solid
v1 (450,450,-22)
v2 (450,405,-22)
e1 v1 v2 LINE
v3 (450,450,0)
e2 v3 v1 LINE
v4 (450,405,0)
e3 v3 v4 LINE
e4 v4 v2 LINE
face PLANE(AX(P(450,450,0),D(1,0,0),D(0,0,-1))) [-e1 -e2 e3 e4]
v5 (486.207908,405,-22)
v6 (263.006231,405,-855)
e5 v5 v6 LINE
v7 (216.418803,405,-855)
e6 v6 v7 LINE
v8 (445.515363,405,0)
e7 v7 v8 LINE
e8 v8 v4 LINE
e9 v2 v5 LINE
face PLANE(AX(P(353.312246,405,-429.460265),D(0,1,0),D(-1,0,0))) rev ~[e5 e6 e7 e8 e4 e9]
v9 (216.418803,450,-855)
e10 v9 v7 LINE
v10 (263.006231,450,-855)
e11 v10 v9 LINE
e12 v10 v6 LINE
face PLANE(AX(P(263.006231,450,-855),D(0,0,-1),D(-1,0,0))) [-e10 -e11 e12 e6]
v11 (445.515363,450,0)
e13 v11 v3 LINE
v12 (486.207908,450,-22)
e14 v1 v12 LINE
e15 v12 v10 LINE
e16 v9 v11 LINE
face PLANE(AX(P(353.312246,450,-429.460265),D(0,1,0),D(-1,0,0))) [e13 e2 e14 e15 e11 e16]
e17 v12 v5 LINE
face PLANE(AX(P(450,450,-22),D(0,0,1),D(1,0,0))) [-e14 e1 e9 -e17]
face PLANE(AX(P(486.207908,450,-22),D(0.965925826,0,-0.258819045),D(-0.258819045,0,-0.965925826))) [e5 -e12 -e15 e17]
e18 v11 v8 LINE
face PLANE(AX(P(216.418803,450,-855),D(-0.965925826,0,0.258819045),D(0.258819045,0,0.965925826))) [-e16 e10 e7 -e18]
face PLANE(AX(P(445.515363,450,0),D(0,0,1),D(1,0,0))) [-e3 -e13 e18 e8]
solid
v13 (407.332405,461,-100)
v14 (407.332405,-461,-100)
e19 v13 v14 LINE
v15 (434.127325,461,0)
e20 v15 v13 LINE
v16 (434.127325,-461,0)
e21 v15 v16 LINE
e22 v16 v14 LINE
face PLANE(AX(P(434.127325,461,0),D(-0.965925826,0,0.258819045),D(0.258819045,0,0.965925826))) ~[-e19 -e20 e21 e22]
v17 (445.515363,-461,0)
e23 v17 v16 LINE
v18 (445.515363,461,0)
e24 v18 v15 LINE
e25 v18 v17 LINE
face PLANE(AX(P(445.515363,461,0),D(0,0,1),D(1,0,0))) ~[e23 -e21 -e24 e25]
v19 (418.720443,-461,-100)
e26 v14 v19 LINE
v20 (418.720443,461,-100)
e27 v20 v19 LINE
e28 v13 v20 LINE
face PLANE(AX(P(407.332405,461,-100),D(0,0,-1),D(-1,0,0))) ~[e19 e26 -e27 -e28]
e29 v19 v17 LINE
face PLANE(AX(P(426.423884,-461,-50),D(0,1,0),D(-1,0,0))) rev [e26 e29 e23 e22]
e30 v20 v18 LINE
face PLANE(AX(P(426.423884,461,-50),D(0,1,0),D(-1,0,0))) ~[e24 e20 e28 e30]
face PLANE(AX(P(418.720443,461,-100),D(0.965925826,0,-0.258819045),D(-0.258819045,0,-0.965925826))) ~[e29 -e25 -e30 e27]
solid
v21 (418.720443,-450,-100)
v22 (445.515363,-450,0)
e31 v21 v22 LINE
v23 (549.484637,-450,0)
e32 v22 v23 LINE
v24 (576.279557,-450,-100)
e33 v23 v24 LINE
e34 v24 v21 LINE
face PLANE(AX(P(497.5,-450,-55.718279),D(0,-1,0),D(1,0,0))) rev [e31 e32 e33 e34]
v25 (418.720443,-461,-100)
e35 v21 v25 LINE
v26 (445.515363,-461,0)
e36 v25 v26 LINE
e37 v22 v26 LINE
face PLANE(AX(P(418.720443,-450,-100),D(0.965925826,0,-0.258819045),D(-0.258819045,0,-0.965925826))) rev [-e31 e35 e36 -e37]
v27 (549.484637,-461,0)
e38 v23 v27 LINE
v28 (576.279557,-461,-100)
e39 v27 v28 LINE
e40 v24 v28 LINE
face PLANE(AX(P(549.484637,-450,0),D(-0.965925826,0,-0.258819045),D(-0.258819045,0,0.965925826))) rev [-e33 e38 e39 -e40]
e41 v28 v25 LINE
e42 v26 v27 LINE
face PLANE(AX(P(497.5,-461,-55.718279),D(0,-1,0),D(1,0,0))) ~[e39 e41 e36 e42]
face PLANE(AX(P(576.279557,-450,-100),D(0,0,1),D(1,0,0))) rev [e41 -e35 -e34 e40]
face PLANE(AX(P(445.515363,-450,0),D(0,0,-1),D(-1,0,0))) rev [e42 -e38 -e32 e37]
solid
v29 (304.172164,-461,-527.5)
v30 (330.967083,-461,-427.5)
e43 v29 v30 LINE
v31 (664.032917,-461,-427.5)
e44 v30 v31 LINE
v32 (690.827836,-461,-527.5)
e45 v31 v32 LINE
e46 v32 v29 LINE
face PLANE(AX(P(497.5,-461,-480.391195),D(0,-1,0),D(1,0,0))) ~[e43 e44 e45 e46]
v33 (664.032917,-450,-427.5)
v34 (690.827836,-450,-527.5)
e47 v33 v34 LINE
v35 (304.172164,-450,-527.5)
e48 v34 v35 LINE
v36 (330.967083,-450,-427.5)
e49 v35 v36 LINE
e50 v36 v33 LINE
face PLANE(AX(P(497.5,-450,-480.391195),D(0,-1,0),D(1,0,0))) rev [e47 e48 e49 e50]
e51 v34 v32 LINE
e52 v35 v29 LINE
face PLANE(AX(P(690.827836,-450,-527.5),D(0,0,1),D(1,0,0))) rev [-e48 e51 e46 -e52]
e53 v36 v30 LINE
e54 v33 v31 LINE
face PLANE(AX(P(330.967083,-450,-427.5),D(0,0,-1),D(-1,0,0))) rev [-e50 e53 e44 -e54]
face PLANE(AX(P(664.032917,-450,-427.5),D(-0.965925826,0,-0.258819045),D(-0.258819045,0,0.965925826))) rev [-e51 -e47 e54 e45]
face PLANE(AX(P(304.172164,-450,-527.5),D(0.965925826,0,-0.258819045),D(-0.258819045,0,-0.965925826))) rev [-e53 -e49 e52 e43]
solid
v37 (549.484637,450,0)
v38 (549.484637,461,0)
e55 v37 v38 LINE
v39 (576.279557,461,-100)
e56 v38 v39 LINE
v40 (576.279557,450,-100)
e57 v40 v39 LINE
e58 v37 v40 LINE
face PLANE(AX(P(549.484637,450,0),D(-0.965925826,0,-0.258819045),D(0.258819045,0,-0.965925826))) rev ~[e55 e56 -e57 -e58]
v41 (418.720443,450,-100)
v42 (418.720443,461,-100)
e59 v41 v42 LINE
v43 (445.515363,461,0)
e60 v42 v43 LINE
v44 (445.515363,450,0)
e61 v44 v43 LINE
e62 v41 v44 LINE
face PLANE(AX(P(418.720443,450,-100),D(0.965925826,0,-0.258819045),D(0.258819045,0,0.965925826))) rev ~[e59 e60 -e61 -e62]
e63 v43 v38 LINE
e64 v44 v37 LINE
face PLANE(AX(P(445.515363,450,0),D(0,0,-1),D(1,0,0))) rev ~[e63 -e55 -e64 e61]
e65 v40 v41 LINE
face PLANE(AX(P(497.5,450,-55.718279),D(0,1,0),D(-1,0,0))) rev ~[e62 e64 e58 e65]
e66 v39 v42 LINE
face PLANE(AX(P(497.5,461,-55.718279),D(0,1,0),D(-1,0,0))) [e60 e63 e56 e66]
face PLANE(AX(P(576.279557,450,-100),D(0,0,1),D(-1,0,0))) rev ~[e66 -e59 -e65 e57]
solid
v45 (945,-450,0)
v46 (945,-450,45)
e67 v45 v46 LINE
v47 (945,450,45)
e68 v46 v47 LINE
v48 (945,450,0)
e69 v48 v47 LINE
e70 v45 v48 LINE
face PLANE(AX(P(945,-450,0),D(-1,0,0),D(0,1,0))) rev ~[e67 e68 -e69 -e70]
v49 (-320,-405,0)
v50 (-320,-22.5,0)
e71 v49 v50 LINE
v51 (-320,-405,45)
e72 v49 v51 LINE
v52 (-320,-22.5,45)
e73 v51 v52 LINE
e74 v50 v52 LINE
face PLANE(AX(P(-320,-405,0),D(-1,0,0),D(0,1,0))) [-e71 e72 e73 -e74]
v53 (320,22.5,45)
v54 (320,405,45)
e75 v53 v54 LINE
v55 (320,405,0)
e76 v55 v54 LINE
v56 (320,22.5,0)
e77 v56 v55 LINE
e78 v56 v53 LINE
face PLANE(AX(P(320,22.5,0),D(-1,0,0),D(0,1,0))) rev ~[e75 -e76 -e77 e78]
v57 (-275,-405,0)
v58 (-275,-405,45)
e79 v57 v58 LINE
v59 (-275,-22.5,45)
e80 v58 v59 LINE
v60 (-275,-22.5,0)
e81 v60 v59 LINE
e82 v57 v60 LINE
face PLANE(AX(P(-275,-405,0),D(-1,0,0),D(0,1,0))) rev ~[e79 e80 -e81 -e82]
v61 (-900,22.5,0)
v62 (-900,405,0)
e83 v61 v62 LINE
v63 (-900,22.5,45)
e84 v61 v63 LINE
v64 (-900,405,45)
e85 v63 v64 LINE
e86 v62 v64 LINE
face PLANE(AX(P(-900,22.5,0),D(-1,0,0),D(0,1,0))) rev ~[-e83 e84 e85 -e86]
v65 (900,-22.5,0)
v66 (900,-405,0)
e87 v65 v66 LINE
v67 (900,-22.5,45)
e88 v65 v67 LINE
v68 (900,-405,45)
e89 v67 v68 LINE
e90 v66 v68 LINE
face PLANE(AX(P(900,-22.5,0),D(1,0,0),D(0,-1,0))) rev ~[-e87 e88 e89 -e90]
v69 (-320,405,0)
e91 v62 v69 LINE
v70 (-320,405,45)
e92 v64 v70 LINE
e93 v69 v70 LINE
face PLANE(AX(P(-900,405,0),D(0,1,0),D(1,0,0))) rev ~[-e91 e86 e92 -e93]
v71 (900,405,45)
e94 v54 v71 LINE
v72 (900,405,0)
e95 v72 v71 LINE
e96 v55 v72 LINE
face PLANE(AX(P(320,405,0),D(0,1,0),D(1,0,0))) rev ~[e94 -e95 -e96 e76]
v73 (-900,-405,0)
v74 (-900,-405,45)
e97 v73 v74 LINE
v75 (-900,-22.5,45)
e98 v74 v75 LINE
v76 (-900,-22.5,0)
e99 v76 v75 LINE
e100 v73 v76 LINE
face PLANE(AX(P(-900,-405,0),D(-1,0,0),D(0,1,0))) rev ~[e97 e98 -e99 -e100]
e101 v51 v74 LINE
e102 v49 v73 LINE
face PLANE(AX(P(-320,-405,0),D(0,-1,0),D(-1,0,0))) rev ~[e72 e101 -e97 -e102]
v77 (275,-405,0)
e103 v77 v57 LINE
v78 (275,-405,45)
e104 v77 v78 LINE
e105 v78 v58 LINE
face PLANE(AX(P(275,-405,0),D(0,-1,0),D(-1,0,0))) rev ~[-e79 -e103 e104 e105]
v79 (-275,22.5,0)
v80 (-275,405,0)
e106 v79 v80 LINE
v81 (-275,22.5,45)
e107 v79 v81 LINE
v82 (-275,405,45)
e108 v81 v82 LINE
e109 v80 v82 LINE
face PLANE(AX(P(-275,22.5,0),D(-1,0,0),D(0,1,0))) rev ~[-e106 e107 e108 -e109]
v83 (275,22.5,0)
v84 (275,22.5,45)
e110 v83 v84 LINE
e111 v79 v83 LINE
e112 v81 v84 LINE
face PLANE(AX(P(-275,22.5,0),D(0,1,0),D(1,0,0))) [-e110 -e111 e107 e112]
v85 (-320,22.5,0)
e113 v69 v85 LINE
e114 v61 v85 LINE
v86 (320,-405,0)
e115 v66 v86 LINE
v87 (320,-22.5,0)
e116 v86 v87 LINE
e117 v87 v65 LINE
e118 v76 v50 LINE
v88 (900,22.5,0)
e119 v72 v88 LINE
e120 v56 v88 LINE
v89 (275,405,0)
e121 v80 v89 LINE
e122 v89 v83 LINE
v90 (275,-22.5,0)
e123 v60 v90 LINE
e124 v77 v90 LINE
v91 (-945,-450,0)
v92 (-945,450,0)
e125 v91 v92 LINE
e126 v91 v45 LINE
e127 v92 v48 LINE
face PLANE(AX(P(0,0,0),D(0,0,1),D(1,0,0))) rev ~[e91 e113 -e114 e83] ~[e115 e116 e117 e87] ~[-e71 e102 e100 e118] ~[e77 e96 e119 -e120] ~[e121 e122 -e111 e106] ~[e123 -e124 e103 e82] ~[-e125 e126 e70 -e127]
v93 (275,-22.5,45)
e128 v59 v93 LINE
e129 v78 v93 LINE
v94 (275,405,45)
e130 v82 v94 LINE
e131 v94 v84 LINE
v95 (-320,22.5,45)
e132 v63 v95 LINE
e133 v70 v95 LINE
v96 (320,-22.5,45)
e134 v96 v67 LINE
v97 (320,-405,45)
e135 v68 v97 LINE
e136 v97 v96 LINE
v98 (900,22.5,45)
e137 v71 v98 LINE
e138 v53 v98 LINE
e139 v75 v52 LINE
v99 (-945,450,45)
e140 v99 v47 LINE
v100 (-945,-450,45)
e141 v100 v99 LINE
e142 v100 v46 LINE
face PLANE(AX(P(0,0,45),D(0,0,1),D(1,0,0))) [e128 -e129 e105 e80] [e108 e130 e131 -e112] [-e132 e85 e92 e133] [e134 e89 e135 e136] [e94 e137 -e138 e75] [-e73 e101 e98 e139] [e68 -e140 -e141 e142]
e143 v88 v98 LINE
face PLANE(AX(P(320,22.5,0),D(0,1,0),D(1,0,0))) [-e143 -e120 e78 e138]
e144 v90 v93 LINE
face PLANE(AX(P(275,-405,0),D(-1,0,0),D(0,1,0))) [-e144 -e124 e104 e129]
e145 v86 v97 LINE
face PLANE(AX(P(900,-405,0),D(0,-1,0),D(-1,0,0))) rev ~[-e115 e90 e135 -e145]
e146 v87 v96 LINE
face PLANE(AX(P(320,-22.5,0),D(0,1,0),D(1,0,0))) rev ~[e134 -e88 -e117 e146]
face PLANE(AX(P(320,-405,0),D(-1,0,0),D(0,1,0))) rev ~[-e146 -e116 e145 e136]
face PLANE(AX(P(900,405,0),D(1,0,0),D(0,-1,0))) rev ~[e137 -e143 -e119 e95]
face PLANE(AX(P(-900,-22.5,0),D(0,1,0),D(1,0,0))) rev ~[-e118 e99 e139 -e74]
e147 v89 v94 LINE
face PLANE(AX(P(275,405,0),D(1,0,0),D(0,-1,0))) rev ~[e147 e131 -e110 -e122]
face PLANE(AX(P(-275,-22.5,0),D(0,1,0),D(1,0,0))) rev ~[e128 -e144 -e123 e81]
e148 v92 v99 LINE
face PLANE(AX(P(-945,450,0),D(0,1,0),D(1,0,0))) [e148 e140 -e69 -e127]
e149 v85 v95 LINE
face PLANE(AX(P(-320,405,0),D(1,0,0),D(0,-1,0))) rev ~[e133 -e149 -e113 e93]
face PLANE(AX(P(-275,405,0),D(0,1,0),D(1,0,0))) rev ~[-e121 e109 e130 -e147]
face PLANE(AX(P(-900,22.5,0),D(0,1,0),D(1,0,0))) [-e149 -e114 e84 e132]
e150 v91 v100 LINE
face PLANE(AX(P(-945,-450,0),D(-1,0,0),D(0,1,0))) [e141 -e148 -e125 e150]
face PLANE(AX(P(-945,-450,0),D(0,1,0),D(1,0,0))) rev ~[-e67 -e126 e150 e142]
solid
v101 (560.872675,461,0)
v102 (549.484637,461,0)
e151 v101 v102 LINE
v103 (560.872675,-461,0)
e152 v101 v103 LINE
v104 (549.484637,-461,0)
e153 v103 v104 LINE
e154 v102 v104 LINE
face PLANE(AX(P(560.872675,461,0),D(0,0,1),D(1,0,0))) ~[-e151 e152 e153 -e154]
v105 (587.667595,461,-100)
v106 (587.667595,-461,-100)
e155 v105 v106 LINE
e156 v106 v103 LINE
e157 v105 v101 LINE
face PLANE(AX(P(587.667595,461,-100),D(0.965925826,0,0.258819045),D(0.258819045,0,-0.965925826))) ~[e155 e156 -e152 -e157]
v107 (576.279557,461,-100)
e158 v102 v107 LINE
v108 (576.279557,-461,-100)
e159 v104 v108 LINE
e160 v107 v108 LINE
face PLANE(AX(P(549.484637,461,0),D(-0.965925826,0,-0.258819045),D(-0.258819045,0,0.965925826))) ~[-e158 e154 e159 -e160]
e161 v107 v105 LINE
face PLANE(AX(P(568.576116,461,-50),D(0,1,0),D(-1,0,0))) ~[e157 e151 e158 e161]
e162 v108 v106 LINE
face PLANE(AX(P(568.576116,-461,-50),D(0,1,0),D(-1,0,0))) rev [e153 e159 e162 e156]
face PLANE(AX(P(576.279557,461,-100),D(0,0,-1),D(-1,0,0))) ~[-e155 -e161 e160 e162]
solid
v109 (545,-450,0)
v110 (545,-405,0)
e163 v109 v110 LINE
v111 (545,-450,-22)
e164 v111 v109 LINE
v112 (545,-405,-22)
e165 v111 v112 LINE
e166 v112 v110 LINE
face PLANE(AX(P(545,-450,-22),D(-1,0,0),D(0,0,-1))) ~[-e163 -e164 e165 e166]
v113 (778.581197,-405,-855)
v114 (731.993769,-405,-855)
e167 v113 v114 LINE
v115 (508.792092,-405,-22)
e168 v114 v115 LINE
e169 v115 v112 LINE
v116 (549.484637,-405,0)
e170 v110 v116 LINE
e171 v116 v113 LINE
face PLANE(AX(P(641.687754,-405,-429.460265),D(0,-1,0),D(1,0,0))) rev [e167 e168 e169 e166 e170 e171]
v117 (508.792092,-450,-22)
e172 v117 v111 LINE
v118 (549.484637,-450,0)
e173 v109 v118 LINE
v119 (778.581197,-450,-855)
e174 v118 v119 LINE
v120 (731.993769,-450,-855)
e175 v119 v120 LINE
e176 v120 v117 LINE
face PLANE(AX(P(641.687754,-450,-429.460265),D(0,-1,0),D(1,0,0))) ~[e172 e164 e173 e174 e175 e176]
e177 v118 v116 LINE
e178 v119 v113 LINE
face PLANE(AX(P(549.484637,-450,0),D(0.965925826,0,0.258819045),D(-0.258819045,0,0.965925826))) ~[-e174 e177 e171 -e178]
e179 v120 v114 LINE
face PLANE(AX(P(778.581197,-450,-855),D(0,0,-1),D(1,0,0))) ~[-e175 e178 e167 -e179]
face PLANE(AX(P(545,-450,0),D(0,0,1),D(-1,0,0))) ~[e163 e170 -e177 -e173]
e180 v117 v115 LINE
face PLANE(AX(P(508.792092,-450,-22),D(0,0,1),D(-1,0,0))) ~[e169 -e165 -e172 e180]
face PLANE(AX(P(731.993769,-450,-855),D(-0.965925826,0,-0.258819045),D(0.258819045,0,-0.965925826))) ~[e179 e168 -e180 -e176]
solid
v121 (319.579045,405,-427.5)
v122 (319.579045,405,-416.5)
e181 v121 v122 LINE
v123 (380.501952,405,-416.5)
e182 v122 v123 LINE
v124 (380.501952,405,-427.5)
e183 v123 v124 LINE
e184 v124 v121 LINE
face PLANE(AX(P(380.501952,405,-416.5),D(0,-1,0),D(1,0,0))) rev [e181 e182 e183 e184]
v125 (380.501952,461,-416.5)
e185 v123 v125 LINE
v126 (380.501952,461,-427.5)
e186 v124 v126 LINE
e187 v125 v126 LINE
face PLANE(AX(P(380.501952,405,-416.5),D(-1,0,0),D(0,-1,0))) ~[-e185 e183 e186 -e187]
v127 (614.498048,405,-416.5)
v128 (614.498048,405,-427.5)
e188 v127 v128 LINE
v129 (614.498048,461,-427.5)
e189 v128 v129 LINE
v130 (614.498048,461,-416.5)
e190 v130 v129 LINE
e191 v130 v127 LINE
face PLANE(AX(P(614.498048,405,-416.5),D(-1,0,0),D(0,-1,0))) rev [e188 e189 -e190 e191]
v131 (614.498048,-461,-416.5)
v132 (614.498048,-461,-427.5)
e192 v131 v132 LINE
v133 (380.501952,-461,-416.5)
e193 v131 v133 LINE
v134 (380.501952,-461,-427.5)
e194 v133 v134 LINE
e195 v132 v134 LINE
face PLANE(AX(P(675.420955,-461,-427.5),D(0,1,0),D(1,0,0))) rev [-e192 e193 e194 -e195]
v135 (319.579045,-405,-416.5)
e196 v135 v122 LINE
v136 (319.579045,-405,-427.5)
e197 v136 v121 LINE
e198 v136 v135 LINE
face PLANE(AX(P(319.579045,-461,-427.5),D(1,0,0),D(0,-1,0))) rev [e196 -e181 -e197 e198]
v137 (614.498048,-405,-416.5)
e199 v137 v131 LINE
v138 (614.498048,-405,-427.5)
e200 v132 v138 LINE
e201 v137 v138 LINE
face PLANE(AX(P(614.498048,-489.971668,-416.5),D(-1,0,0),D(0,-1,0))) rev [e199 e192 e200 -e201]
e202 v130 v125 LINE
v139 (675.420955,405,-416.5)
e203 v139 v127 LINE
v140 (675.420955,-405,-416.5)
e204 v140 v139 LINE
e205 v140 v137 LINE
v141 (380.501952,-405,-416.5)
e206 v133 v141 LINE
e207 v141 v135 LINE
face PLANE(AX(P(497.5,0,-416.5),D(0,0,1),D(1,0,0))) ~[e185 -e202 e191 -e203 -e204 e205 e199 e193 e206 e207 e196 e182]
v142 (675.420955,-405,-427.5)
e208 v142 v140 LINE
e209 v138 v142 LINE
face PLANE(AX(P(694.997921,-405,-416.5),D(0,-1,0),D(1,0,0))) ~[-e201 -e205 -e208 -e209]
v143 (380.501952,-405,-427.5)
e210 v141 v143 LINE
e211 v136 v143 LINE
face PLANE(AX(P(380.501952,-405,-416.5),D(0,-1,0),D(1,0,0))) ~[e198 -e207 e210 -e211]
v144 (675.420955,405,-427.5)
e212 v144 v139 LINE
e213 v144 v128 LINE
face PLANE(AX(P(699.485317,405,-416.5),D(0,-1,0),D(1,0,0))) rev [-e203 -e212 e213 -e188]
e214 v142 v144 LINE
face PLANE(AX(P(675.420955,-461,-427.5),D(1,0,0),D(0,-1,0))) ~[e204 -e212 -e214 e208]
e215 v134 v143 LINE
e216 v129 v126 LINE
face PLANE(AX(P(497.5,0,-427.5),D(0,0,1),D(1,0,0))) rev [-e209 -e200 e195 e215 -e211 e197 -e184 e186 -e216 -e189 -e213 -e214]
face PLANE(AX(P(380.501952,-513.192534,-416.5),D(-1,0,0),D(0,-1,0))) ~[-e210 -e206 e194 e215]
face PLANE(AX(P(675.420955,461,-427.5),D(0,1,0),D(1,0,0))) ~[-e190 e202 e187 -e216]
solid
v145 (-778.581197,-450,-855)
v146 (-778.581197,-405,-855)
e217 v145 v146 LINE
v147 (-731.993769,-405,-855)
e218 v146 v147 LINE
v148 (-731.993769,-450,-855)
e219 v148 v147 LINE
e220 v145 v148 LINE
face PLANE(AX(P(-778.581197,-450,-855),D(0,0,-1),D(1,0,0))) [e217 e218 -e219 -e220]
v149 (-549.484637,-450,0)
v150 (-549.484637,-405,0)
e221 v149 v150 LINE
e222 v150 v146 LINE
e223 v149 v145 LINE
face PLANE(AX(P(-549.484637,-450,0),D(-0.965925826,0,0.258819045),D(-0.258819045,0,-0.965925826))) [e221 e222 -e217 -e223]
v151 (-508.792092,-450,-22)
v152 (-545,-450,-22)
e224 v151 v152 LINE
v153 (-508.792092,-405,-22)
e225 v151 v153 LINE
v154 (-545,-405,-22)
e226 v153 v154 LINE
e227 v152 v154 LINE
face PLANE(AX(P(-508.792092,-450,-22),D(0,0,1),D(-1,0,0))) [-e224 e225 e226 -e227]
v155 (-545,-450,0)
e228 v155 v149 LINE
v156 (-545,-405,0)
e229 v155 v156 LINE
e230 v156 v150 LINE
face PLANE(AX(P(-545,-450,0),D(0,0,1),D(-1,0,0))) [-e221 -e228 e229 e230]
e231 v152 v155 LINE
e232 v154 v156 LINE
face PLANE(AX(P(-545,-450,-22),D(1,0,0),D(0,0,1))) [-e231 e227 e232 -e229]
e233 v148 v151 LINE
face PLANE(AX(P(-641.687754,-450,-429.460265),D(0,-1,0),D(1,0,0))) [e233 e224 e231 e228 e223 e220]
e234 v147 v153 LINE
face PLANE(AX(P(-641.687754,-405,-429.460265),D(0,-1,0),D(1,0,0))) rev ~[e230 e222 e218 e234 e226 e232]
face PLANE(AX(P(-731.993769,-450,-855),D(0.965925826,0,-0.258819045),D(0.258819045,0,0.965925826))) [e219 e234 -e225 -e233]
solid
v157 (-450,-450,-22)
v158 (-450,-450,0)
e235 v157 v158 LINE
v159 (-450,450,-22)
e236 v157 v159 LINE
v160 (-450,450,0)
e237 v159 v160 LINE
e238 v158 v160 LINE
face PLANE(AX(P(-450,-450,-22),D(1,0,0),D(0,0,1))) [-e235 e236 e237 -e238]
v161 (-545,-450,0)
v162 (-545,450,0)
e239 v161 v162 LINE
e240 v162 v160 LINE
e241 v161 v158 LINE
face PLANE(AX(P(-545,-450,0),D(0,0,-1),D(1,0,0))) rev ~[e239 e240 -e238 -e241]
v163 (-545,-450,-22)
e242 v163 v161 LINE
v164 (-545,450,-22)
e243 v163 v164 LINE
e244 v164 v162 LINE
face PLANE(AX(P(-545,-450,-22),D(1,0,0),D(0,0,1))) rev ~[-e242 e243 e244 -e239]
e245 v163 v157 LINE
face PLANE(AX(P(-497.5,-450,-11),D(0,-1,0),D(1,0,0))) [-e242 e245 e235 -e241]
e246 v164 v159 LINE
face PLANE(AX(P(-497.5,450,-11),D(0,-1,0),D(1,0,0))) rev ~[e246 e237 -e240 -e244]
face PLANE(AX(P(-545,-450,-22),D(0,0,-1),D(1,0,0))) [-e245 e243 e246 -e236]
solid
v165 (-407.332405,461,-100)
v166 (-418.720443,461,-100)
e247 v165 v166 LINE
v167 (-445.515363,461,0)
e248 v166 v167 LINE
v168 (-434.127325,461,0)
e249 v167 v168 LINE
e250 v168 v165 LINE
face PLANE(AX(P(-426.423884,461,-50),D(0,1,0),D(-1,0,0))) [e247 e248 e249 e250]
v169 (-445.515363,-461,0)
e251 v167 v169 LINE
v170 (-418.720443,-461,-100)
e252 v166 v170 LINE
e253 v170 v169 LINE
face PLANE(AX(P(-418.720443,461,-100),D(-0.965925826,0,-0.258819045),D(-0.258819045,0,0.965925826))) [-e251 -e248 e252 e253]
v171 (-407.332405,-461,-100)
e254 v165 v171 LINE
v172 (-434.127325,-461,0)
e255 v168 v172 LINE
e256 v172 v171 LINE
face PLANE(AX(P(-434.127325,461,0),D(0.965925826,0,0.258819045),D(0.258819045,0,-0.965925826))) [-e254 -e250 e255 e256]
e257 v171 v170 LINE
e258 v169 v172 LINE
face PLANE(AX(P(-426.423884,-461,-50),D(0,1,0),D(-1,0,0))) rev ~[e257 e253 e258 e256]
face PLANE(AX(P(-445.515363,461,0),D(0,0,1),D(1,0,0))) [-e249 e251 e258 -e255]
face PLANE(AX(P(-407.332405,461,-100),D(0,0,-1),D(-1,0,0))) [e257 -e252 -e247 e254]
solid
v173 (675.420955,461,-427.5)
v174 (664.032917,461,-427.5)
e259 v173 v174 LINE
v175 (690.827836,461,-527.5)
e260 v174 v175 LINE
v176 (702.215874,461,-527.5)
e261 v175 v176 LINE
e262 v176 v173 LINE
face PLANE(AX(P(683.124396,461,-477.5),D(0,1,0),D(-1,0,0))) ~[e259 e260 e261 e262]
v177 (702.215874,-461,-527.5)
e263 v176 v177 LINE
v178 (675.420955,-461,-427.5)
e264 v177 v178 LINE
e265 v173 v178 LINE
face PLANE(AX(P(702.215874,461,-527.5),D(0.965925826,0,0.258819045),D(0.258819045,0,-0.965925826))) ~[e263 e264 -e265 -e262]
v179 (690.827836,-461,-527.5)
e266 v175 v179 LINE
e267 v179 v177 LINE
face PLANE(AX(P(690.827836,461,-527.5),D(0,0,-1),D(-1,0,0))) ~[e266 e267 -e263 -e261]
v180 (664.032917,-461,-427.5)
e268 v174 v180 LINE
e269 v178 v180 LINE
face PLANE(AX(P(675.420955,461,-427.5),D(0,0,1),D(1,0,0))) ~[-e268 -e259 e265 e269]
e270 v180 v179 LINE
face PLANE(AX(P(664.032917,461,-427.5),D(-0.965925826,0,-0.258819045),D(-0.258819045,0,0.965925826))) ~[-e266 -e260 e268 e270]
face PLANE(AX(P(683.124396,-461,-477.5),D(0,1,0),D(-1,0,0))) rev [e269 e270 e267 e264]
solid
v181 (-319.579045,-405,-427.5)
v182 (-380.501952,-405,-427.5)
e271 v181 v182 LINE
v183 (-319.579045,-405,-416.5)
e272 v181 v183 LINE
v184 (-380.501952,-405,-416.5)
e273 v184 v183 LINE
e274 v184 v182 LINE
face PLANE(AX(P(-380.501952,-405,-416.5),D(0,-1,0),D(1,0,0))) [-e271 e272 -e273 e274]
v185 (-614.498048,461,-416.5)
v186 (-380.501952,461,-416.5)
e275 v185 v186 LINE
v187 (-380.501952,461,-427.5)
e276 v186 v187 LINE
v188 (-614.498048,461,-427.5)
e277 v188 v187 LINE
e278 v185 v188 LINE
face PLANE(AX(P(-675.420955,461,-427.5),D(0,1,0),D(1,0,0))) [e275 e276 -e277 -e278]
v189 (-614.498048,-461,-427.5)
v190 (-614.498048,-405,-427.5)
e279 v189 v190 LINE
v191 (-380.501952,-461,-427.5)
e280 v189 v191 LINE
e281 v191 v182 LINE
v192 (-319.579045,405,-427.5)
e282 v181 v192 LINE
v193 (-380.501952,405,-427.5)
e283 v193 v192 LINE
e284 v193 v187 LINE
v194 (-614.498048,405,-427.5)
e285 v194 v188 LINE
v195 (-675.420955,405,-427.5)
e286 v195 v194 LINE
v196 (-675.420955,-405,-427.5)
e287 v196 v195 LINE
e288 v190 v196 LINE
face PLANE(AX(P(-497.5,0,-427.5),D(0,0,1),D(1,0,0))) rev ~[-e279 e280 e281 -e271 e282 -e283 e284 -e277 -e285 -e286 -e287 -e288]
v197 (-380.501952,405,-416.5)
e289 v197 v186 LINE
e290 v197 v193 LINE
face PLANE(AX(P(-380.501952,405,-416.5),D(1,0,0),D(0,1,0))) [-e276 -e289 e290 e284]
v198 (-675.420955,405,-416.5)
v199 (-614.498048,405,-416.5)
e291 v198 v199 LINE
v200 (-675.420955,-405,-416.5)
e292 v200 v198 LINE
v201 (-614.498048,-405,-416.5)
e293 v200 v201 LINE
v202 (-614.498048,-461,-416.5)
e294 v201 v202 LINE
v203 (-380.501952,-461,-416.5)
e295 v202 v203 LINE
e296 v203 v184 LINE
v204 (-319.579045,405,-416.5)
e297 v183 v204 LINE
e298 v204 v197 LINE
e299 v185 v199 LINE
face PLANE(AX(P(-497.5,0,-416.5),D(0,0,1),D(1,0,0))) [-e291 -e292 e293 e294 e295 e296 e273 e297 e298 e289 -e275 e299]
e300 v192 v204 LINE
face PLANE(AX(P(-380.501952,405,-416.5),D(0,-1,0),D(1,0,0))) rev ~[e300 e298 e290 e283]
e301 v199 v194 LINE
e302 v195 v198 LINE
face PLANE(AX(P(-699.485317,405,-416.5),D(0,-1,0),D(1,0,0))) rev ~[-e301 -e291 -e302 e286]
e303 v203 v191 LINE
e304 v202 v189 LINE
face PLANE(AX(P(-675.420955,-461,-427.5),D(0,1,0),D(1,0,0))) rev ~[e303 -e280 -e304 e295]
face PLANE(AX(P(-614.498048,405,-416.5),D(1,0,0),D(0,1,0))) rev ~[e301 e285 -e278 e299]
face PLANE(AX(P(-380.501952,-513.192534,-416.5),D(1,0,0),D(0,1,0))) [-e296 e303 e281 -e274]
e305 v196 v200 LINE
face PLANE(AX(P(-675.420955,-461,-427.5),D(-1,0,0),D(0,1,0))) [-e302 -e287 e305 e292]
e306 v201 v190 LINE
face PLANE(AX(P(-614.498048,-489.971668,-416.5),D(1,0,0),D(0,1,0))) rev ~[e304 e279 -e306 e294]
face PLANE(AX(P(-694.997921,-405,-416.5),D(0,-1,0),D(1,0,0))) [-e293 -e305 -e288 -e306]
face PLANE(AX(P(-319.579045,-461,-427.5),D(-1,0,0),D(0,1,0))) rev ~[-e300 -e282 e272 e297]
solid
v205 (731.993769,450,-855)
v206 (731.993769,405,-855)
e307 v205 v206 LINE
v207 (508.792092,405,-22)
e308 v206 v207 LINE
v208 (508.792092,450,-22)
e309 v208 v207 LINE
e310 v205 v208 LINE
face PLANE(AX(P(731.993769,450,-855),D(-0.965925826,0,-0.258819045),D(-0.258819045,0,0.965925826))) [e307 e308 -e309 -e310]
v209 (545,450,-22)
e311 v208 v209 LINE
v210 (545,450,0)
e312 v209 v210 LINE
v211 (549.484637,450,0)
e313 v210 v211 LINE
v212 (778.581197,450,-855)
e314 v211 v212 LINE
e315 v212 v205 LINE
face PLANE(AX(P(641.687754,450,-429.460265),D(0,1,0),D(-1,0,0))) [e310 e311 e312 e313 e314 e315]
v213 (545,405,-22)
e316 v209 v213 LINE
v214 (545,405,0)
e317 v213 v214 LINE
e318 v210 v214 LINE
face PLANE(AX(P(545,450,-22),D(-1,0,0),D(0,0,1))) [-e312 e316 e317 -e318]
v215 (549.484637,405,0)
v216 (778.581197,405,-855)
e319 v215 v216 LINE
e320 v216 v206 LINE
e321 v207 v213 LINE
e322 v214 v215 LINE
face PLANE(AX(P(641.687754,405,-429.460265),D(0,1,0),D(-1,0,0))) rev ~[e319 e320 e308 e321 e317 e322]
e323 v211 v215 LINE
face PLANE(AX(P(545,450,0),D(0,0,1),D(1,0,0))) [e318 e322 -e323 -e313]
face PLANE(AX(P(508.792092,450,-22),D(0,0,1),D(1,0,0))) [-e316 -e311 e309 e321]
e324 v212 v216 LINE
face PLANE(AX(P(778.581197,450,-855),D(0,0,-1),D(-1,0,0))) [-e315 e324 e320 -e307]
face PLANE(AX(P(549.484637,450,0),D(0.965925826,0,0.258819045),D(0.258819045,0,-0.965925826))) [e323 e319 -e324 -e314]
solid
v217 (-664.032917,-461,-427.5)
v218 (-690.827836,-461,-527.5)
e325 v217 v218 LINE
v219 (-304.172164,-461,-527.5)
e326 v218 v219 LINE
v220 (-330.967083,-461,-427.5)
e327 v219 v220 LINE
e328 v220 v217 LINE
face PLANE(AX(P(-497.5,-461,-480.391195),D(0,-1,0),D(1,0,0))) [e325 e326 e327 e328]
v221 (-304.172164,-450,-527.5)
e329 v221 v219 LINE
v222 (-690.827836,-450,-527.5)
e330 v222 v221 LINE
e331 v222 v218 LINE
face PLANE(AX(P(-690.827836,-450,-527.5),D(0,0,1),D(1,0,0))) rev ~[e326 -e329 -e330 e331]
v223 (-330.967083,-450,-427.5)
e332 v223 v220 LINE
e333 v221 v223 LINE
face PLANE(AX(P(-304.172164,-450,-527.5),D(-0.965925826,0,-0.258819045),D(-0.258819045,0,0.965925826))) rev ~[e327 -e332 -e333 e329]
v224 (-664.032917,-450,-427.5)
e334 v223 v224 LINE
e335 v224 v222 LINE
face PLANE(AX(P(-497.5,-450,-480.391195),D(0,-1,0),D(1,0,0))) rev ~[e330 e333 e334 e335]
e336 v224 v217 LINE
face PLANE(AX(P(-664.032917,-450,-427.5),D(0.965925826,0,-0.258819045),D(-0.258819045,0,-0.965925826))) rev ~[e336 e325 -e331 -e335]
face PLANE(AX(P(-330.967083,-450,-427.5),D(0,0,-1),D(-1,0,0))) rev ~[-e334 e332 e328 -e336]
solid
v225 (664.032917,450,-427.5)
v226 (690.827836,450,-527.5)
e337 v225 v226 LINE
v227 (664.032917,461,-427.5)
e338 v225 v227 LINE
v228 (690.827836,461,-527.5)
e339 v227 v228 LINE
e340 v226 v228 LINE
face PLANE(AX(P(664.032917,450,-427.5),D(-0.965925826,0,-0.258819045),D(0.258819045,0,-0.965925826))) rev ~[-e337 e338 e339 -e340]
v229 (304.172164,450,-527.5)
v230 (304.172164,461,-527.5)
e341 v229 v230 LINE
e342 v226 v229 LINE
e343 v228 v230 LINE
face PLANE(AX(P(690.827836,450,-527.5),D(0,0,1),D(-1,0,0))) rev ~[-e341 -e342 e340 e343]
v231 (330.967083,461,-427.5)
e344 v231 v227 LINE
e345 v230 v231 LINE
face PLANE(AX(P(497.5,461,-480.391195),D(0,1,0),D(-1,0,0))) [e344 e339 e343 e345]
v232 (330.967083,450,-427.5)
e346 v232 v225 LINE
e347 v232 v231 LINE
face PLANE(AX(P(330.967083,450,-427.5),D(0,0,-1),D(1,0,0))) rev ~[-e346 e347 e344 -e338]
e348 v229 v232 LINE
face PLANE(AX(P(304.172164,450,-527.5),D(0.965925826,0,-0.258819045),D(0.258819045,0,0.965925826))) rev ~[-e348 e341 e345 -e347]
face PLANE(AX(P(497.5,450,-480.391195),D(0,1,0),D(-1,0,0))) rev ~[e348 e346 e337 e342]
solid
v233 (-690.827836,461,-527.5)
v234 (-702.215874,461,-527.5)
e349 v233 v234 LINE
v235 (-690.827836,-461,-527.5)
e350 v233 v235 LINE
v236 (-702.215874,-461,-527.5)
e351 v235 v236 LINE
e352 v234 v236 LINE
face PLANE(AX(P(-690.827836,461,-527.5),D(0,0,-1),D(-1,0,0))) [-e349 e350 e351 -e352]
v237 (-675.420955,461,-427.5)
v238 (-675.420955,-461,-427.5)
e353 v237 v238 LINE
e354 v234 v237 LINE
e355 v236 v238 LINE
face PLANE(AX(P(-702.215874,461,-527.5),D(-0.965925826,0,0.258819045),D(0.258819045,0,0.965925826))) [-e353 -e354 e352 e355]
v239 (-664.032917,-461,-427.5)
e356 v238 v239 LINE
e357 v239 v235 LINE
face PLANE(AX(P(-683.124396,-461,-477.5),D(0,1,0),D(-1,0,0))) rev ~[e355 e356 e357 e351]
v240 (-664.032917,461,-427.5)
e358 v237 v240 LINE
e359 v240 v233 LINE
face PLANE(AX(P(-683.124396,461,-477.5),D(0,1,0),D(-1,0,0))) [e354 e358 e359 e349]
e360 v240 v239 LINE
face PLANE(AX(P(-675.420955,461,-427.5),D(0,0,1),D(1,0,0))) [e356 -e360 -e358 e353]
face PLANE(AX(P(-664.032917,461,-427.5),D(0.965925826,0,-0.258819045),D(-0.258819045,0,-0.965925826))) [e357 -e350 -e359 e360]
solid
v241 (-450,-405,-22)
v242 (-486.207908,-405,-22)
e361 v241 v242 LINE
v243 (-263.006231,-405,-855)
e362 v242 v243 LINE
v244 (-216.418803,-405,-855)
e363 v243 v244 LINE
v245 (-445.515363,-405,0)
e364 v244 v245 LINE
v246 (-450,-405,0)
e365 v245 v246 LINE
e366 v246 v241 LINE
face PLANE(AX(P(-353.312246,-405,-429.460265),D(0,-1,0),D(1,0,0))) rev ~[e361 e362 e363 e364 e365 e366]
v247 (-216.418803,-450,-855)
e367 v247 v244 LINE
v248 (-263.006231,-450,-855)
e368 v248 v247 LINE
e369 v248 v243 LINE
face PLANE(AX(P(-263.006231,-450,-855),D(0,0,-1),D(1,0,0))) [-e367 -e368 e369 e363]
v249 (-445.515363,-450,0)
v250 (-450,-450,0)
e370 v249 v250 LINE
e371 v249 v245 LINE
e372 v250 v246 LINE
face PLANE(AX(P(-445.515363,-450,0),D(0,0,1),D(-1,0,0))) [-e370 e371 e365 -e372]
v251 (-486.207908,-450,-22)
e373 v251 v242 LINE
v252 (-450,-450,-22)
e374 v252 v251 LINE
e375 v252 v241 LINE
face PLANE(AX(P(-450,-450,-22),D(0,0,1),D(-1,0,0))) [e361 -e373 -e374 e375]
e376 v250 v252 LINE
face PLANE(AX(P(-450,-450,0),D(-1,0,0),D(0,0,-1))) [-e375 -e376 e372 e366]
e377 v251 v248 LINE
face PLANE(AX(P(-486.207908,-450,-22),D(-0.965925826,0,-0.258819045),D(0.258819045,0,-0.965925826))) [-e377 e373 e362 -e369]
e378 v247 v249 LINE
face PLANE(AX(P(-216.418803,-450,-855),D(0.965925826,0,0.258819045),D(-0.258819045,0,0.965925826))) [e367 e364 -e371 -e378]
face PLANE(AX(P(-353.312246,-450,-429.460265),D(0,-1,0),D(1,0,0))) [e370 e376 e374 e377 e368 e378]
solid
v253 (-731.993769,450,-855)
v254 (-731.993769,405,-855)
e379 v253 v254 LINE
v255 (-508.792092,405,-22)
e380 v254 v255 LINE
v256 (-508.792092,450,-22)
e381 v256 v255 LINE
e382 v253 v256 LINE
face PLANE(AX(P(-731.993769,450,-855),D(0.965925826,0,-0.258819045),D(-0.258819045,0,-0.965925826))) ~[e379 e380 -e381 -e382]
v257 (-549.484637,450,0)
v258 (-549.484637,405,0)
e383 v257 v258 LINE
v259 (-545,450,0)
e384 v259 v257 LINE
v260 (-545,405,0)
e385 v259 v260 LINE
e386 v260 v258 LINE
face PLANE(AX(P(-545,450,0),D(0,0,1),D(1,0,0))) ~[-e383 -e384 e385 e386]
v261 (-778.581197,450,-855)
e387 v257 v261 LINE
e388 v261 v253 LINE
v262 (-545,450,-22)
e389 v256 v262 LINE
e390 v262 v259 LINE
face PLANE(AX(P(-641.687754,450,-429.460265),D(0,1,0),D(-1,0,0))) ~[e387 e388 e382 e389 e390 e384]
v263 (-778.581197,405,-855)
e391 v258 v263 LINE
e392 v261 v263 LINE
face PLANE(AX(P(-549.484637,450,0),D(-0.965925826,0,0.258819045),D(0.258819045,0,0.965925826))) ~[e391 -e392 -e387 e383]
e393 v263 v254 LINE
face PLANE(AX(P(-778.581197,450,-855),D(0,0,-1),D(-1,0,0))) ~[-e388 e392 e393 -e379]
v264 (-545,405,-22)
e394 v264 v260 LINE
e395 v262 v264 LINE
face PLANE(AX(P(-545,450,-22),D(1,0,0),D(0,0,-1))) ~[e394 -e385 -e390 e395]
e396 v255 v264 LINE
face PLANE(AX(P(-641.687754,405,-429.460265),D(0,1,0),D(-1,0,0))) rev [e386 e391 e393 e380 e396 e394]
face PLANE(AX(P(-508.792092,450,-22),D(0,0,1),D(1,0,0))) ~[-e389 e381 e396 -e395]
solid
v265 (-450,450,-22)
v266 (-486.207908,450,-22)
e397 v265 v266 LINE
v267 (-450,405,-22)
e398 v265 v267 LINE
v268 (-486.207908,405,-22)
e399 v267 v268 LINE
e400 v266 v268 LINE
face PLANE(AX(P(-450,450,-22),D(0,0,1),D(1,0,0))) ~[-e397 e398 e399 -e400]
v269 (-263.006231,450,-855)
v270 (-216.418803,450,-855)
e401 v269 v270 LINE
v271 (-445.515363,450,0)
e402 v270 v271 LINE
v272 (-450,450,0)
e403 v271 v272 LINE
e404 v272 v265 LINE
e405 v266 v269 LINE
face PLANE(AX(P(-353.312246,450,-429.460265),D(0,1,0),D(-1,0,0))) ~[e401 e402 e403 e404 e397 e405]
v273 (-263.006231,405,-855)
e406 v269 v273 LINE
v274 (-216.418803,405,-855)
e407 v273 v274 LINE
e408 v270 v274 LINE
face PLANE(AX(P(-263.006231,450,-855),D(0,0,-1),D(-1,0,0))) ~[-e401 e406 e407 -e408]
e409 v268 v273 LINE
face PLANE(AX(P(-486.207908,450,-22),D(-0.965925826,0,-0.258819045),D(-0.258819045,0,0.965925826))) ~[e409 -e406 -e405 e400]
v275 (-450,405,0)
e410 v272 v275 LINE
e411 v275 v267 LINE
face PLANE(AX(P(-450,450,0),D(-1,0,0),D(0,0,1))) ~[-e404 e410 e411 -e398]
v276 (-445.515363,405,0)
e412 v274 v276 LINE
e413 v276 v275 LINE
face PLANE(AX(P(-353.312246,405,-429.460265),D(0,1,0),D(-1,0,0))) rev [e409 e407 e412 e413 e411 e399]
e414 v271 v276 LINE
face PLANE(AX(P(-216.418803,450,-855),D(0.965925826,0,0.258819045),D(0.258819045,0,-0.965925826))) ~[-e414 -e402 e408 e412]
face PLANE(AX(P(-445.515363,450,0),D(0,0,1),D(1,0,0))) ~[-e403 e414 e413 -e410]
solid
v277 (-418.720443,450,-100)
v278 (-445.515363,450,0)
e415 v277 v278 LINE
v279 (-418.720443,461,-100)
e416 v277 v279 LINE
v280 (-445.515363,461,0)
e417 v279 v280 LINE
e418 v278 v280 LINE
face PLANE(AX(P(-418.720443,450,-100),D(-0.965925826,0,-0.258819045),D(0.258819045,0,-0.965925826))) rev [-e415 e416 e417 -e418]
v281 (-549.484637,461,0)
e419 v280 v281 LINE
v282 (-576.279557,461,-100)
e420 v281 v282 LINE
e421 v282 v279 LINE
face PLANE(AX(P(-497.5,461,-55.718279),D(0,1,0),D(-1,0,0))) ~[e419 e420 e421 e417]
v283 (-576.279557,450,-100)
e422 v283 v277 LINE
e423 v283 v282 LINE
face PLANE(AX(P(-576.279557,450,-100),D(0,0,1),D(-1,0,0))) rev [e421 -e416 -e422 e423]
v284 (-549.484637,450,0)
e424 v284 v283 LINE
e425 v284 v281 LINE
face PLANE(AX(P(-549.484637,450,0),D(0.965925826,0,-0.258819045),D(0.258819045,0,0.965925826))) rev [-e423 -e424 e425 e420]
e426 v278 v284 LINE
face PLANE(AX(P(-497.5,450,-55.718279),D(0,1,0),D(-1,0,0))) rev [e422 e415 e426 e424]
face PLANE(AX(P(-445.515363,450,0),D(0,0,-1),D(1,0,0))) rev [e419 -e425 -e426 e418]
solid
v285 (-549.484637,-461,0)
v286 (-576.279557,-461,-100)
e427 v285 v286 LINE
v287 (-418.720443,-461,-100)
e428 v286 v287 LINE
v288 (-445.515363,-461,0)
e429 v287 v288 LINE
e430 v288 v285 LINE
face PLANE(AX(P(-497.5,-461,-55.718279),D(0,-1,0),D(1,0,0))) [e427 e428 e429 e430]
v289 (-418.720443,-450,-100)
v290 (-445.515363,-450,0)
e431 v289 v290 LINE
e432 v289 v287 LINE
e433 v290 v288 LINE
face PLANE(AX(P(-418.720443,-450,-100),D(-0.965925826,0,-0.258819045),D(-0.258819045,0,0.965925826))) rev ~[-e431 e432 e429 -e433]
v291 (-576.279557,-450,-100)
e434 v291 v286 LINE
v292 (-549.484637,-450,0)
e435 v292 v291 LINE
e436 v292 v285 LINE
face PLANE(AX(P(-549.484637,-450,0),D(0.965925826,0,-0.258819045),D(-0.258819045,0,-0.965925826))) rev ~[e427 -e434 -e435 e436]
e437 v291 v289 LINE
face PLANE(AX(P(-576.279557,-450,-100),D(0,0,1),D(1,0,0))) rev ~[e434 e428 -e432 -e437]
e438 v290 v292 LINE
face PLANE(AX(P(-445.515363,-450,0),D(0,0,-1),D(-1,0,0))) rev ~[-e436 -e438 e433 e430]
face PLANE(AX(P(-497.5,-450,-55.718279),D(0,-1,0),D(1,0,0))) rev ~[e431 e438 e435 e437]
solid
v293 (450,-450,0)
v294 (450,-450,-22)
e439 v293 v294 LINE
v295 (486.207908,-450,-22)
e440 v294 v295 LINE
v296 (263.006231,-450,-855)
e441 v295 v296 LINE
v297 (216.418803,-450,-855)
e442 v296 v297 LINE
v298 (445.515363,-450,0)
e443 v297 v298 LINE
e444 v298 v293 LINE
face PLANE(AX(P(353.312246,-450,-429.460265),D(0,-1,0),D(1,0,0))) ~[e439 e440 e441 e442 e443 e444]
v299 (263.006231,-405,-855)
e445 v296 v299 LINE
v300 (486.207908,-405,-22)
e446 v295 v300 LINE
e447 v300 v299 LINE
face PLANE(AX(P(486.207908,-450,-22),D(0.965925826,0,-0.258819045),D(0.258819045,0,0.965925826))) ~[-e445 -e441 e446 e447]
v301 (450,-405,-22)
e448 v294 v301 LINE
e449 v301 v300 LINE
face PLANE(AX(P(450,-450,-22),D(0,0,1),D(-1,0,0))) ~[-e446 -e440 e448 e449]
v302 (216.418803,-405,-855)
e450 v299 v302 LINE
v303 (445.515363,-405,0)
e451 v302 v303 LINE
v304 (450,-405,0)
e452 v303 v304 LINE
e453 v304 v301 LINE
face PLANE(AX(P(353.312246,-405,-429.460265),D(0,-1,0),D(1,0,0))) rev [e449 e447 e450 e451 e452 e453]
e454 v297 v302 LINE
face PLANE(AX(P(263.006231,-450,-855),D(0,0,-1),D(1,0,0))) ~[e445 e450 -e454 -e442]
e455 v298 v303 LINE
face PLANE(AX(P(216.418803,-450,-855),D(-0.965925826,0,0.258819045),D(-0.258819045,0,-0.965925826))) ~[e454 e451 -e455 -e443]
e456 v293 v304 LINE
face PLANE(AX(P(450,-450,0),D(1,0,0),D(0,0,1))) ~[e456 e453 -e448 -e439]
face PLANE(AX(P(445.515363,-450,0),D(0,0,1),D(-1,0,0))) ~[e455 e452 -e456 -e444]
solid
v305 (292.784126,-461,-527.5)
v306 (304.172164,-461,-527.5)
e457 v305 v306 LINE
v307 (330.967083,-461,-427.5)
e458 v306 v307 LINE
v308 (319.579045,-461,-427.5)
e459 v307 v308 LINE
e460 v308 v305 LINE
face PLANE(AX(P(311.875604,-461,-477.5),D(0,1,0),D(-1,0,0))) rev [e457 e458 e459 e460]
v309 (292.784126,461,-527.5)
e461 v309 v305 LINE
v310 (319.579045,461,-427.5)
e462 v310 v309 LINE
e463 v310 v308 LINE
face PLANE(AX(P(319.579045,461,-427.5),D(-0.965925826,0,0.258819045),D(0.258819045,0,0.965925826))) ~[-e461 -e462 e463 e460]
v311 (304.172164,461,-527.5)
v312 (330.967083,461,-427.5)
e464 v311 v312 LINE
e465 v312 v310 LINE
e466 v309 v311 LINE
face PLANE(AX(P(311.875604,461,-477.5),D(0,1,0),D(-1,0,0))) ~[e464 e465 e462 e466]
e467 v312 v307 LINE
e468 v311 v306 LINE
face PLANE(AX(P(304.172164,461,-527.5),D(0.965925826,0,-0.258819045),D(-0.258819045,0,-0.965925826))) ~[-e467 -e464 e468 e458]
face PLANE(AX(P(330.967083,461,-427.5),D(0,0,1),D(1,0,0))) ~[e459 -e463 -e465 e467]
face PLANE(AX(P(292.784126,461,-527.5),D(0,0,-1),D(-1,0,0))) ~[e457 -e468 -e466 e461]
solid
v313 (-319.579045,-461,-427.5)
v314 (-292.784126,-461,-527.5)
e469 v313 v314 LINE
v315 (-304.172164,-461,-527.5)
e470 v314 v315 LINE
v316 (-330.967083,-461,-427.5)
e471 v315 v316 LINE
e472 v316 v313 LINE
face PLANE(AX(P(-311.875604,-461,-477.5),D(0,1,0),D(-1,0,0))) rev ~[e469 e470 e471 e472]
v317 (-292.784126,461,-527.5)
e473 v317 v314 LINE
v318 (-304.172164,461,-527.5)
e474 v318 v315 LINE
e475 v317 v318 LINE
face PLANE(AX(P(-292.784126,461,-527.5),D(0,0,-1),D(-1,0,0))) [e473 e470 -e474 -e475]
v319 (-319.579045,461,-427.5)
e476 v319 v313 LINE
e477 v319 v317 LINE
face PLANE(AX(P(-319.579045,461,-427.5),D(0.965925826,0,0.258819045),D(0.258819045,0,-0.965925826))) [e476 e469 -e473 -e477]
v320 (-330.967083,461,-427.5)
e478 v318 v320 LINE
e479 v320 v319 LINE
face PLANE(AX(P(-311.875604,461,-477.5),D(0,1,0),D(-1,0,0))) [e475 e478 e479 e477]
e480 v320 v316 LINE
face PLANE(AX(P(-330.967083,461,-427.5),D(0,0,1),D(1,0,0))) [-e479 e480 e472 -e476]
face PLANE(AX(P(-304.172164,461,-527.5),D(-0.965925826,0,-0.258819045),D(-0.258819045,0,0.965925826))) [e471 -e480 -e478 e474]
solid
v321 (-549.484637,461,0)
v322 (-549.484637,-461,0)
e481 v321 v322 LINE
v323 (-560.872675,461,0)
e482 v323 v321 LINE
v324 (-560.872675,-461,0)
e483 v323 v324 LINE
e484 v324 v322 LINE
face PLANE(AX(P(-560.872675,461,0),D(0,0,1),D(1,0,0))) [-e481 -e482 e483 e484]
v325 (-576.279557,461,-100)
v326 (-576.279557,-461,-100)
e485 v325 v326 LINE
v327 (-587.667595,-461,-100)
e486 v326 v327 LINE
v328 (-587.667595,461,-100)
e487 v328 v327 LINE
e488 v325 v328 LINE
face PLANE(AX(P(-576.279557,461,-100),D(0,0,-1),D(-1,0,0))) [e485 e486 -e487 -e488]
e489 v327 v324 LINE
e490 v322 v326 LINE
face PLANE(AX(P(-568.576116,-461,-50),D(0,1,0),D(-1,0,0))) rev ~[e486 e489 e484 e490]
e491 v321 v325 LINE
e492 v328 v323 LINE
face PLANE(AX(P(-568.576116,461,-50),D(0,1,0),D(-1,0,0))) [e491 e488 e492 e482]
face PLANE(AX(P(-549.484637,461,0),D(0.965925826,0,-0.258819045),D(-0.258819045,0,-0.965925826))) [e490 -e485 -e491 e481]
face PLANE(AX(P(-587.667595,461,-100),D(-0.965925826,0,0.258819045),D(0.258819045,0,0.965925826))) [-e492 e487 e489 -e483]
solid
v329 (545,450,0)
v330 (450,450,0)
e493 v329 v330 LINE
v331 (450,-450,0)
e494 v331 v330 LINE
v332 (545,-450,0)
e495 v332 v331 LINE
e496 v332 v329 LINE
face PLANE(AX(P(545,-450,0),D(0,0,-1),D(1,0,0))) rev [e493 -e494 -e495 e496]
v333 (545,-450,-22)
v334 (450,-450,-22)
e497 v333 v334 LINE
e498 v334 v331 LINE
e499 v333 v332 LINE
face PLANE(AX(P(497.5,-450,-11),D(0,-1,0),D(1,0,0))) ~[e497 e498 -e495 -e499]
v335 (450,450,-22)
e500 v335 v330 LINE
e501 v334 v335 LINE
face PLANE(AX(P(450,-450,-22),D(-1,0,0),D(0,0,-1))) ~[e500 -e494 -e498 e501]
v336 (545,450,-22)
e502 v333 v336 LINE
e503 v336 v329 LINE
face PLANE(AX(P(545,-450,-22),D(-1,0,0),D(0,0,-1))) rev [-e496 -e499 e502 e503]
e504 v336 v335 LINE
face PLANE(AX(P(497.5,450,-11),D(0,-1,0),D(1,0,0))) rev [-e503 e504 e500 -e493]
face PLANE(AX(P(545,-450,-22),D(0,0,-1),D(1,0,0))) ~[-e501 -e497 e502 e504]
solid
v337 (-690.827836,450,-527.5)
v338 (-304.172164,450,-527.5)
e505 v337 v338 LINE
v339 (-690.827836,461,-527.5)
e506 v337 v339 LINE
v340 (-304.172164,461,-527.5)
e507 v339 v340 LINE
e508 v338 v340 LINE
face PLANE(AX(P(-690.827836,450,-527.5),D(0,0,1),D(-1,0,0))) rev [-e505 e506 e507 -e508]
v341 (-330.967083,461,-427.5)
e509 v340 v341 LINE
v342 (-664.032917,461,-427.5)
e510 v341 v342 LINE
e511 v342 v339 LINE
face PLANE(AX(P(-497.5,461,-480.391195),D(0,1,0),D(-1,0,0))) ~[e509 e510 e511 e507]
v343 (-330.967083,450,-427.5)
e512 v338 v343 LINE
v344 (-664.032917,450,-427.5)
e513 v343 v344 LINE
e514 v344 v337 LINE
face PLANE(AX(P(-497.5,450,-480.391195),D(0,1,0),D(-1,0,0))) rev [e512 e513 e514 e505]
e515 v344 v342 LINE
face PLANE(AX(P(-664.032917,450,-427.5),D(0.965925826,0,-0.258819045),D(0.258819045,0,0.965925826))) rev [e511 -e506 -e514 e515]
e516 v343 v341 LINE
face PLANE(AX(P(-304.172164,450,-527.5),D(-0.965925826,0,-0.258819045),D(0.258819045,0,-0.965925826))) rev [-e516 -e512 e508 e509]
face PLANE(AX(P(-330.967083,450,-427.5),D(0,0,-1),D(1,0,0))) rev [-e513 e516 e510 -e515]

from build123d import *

# Parameters (mm, degrees)
F0_W      = 1890
F0_H      = 900
F0_W_2    = 45
F0_H_2    = 382.5
F0_W_3    = 580
F0_H_3    = 45
F0_W_4    = 550
F1_DEPTH  = 45
F2_W      = 95
F2_H      = 22
F3_DEPTH  = 900
F5_DEPTH  = 45
F7_DEPTH  = 11
F10_DEPTH = 922
F11_W     = 355.8419104132
F11_H     = 922
F12_DEPTH = 11
F14_W     = 80.4998734839
F14_H     = 84.9716675282
F14_W_2   = 86.1553862937
F14_H_2   = 108.1925344467
F14_W_3   = 84.9872687705
F14_H_3   = 77.3259413242
F14_W_4   = 99.3894949801
F14_H_4   = 102.0654153824
F15_DEPTH = 438.501


# Not quite as in the source:
# - a feature names something its author has since deleted; it is built from what else it names


with BuildPart() as f1:
    # F0 (on Top) → F1 (new body)
    with BuildSketch(Plane.XY):
        Rectangle(F0_W, F0_H)
        Polygon((320, 405), (900, 405), (900, 22.5), (900, -22.5), (900, -405), (320, -405), (275, -405), (-275, -405), (-320, -405), (-900, -405), (-900, -22.5), (-900, 22.5), (-900, 405), (-320, 405), (-275, 405), (275, 405), align=None, mode=Mode.SUBTRACT)
        with Locations((297.5, 213.75)):
            Rectangle(F0_W_2, F0_H_2)
        with Locations((610, 0)):
            Rectangle(F0_W_3, F0_H_3)
        with Locations((297.5, 0)):
            Rectangle(F0_W_2, F0_H_3)
        with Locations((-297.5, 213.75)):
            Rectangle(F0_W_2, F0_H_2)
        Rectangle(F0_W_4, F0_H_3)
        with Locations((297.5, -213.75)):
            Rectangle(F0_W_2, F0_H_2)
        with Locations((-297.5, 0)):
            Rectangle(F0_W_2, F0_H_3)
        with Locations((-610, 0)):
            Rectangle(F0_W_3, F0_H_3)
        with Locations((-297.5, -213.75)):
            Rectangle(F0_W_2, F0_H_2)
    extrude(amount=F1_DEPTH)


with BuildPart() as f3:
    # F2 (on face) → F3 (new body, through all)
    with BuildSketch(Plane.XZ.offset(450)):
        with Locations((-497.5, -11)):
            Rectangle(F2_W, F2_H)
    extrude(amount=-F3_DEPTH)


with BuildPart() as f5:
    # F4 (on face) → F5 (new body)
    with BuildSketch(Plane.XZ.offset(450)):
        Polygon((-545, 0), (-549.4846374578, 0), (-778.5811969864, -855), (-731.9937688679, -855), (-508.7920915728, -22), (-545, -22), align=None)
    extrude(amount=-F5_DEPTH)


with BuildPart() as f5b:
    # F4 (on face) → F5, piece 2 (new body)
    with BuildSketch(Plane.XZ.offset(450)):
        Polygon((-450, 0), (-450, -22), (-486.2079084272, -22), (-263.0062311321, -855), (-216.4188030136, -855), (-445.5153625422, 0), align=None)
    extrude(amount=-F5_DEPTH)


with BuildPart() as f7:
    # F6 (on face) → F7 (new body)
    with BuildSketch(Plane.XZ.offset(450)):
        Polygon((-330.9670827779, -427.5), (-664.0329172221, -427.5), (-690.8278364652, -527.5), (-304.1721635348, -527.5), align=None)
    extrude(amount=F7_DEPTH)


with BuildPart() as f7b:
    # F6 (on face) → F7, piece 2 (new body)
    with BuildSketch(Plane.XZ.offset(450)):
        Polygon((-445.5153625422, 0), (-549.4846374578, 0), (-576.2795567009, -100), (-418.7204432991, -100), align=None)
    extrude(amount=F7_DEPTH)


with BuildPart() as f8_1:
    # F8: instance of F5
    add(f5.part.mirror(Plane.XZ))


with BuildPart() as f8_2:
    # F8: instance of F5b
    add(f5b.part.mirror(Plane.XZ))


with BuildPart() as f8_3:
    # F8: instance of F7
    add(f7.part.mirror(Plane.XZ))


with BuildPart() as f8_4:
    # F8: instance of F7b
    add(f7b.part.mirror(Plane.XZ))


with BuildPart() as f10:
    # F9 (on face) → F10 (new body, through all)
    with BuildSketch(Plane(origin=(0, 461, 0), x_dir=(-1, 0, 0), z_dir=(0, 1, 0))):
        Polygon((418.7204432991, -100), (445.5153625422, 0), (434.1273245577, 0), (407.3324053146, -100), align=None)
    extrude(amount=-F10_DEPTH)


with BuildPart() as f10b:
    # F9 (on face) → F10, piece 2 (new body, through all)
    with BuildSketch(Plane(origin=(0, 461, 0), x_dir=(-1, 0, 0), z_dir=(0, 1, 0))):
        Polygon((560.8726754423, 0), (549.4846374578, 0), (576.2795567009, -100), (587.6675946854, -100), align=None)
    extrude(amount=-F10_DEPTH)


with BuildPart() as f10c:
    # F9 (on face) → F10, piece 3 (new body, through all)
    with BuildSketch(Plane(origin=(0, 461, 0), x_dir=(-1, 0, 0), z_dir=(0, 1, 0))):
        Polygon((304.1721635348, -527.5), (330.9670827779, -427.5), (319.5790447934, -427.5), (292.7841255503, -527.5), align=None)
    extrude(amount=-F10_DEPTH)


with BuildPart() as f10d:
    # F9 (on face) → F10, piece 4 (new body, through all)
    with BuildSketch(Plane(origin=(0, 461, 0), x_dir=(-1, 0, 0), z_dir=(0, 1, 0))):
        Polygon((675.4209552066, -427.5), (664.0329172221, -427.5), (690.8278364652, -527.5), (702.2158744497, -527.5), align=None)
    extrude(amount=-F10_DEPTH)


with BuildPart() as f12:
    # F11 (on face) → F12 (new body)
    with BuildSketch(Plane.XY.offset(-427.5)):
        with Locations((-497.5, 0)):
            Rectangle(F11_W, F11_H)
    extrude(amount=F12_DEPTH)

    # F13: cut F5, F5b, F8_1, F8_2
    add(f5.part, mode=Mode.SUBTRACT)
    add(f5b.part, mode=Mode.SUBTRACT)
    add(f8_1.part, mode=Mode.SUBTRACT)
    add(f8_2.part, mode=Mode.SUBTRACT)

    # F14 (on face) → F15 (cut, through all)
    with BuildSketch(Plane.XY.offset(-416.5)):
        with Locations((-654.7479847288, -447.4858337641)):
            Rectangle(F14_W, F14_H)
        with Locations((-337.4242588663, -459.0962672234)):
            Rectangle(F14_W_2, F14_H_2)
        with Locations((-656.9916823721, 443.6629706621)):
            Rectangle(F14_W_3, F14_H_3)
        with Locations((-330.8072045231, 456.0327076912)):
            Rectangle(F14_W_4, F14_H_4)
    extrude(amount=-F15_DEPTH, mode=Mode.SUBTRACT)


with BuildPart() as f16_1:
    # F16: instance of F5b
    add(f5b.part.mirror(Plane.YZ))


with BuildPart() as f16_2:
    # F16: instance of F5
    add(f5.part.mirror(Plane.YZ))


with BuildPart() as f16_3:
    # F16: instance of F3
    add(f3.part.mirror(Plane.YZ))


with BuildPart() as f16_4:
    # F16: instance of F8_3
    add(f8_3.part.mirror(Plane.YZ))


with BuildPart() as f16_5:
    # F16: instance of F8_1
    add(f8_1.part.mirror(Plane.YZ))


with BuildPart() as f16_6:
    # F16: instance of F8_2
    add(f8_2.part.mirror(Plane.YZ))


with BuildPart() as f16_7:
    # F16: instance of F8_4
    add(f8_4.part.mirror(Plane.YZ))


with BuildPart() as f16_8:
    # F16: instance of F7
    add(f7.part.mirror(Plane.YZ))


with BuildPart() as f16_9:
    # F16: instance of F7b
    add(f7b.part.mirror(Plane.YZ))


with BuildPart() as f16_10:
    # F16: instance of F12
    add(f12.part.mirror(Plane.YZ))


with BuildPart() as f16_11:
    # F16: instance of F10d
    add(f10d.part.mirror(Plane.YZ))


with BuildPart() as f16_12:
    # F16: instance of F10c
    add(f10c.part.mirror(Plane.YZ))


with BuildPart() as f16_13:
    # F16: instance of F10b
    add(f10b.part.mirror(Plane.YZ))


with BuildPart() as f16_14:
    # F16: instance of F10
    add(f10.part.mirror(Plane.YZ))


solid = Compound([f1.part, f3.part, f5.part, f5b.part, f7.part, f7b.part, f8_1.part, f8_2.part, f8_3.part, f8_4.part, f10.part, f10b.part, f10c.part, f10d.part, f12.part, f16_1.part, f16_2.part, f16_3.part, f16_4.part, f16_5.part, f16_6.part, f16_7.part, f16_8.part, f16_9.part, f16_10.part, f16_11.part, f16_12.part, f16_13.part, f16_14.part])
